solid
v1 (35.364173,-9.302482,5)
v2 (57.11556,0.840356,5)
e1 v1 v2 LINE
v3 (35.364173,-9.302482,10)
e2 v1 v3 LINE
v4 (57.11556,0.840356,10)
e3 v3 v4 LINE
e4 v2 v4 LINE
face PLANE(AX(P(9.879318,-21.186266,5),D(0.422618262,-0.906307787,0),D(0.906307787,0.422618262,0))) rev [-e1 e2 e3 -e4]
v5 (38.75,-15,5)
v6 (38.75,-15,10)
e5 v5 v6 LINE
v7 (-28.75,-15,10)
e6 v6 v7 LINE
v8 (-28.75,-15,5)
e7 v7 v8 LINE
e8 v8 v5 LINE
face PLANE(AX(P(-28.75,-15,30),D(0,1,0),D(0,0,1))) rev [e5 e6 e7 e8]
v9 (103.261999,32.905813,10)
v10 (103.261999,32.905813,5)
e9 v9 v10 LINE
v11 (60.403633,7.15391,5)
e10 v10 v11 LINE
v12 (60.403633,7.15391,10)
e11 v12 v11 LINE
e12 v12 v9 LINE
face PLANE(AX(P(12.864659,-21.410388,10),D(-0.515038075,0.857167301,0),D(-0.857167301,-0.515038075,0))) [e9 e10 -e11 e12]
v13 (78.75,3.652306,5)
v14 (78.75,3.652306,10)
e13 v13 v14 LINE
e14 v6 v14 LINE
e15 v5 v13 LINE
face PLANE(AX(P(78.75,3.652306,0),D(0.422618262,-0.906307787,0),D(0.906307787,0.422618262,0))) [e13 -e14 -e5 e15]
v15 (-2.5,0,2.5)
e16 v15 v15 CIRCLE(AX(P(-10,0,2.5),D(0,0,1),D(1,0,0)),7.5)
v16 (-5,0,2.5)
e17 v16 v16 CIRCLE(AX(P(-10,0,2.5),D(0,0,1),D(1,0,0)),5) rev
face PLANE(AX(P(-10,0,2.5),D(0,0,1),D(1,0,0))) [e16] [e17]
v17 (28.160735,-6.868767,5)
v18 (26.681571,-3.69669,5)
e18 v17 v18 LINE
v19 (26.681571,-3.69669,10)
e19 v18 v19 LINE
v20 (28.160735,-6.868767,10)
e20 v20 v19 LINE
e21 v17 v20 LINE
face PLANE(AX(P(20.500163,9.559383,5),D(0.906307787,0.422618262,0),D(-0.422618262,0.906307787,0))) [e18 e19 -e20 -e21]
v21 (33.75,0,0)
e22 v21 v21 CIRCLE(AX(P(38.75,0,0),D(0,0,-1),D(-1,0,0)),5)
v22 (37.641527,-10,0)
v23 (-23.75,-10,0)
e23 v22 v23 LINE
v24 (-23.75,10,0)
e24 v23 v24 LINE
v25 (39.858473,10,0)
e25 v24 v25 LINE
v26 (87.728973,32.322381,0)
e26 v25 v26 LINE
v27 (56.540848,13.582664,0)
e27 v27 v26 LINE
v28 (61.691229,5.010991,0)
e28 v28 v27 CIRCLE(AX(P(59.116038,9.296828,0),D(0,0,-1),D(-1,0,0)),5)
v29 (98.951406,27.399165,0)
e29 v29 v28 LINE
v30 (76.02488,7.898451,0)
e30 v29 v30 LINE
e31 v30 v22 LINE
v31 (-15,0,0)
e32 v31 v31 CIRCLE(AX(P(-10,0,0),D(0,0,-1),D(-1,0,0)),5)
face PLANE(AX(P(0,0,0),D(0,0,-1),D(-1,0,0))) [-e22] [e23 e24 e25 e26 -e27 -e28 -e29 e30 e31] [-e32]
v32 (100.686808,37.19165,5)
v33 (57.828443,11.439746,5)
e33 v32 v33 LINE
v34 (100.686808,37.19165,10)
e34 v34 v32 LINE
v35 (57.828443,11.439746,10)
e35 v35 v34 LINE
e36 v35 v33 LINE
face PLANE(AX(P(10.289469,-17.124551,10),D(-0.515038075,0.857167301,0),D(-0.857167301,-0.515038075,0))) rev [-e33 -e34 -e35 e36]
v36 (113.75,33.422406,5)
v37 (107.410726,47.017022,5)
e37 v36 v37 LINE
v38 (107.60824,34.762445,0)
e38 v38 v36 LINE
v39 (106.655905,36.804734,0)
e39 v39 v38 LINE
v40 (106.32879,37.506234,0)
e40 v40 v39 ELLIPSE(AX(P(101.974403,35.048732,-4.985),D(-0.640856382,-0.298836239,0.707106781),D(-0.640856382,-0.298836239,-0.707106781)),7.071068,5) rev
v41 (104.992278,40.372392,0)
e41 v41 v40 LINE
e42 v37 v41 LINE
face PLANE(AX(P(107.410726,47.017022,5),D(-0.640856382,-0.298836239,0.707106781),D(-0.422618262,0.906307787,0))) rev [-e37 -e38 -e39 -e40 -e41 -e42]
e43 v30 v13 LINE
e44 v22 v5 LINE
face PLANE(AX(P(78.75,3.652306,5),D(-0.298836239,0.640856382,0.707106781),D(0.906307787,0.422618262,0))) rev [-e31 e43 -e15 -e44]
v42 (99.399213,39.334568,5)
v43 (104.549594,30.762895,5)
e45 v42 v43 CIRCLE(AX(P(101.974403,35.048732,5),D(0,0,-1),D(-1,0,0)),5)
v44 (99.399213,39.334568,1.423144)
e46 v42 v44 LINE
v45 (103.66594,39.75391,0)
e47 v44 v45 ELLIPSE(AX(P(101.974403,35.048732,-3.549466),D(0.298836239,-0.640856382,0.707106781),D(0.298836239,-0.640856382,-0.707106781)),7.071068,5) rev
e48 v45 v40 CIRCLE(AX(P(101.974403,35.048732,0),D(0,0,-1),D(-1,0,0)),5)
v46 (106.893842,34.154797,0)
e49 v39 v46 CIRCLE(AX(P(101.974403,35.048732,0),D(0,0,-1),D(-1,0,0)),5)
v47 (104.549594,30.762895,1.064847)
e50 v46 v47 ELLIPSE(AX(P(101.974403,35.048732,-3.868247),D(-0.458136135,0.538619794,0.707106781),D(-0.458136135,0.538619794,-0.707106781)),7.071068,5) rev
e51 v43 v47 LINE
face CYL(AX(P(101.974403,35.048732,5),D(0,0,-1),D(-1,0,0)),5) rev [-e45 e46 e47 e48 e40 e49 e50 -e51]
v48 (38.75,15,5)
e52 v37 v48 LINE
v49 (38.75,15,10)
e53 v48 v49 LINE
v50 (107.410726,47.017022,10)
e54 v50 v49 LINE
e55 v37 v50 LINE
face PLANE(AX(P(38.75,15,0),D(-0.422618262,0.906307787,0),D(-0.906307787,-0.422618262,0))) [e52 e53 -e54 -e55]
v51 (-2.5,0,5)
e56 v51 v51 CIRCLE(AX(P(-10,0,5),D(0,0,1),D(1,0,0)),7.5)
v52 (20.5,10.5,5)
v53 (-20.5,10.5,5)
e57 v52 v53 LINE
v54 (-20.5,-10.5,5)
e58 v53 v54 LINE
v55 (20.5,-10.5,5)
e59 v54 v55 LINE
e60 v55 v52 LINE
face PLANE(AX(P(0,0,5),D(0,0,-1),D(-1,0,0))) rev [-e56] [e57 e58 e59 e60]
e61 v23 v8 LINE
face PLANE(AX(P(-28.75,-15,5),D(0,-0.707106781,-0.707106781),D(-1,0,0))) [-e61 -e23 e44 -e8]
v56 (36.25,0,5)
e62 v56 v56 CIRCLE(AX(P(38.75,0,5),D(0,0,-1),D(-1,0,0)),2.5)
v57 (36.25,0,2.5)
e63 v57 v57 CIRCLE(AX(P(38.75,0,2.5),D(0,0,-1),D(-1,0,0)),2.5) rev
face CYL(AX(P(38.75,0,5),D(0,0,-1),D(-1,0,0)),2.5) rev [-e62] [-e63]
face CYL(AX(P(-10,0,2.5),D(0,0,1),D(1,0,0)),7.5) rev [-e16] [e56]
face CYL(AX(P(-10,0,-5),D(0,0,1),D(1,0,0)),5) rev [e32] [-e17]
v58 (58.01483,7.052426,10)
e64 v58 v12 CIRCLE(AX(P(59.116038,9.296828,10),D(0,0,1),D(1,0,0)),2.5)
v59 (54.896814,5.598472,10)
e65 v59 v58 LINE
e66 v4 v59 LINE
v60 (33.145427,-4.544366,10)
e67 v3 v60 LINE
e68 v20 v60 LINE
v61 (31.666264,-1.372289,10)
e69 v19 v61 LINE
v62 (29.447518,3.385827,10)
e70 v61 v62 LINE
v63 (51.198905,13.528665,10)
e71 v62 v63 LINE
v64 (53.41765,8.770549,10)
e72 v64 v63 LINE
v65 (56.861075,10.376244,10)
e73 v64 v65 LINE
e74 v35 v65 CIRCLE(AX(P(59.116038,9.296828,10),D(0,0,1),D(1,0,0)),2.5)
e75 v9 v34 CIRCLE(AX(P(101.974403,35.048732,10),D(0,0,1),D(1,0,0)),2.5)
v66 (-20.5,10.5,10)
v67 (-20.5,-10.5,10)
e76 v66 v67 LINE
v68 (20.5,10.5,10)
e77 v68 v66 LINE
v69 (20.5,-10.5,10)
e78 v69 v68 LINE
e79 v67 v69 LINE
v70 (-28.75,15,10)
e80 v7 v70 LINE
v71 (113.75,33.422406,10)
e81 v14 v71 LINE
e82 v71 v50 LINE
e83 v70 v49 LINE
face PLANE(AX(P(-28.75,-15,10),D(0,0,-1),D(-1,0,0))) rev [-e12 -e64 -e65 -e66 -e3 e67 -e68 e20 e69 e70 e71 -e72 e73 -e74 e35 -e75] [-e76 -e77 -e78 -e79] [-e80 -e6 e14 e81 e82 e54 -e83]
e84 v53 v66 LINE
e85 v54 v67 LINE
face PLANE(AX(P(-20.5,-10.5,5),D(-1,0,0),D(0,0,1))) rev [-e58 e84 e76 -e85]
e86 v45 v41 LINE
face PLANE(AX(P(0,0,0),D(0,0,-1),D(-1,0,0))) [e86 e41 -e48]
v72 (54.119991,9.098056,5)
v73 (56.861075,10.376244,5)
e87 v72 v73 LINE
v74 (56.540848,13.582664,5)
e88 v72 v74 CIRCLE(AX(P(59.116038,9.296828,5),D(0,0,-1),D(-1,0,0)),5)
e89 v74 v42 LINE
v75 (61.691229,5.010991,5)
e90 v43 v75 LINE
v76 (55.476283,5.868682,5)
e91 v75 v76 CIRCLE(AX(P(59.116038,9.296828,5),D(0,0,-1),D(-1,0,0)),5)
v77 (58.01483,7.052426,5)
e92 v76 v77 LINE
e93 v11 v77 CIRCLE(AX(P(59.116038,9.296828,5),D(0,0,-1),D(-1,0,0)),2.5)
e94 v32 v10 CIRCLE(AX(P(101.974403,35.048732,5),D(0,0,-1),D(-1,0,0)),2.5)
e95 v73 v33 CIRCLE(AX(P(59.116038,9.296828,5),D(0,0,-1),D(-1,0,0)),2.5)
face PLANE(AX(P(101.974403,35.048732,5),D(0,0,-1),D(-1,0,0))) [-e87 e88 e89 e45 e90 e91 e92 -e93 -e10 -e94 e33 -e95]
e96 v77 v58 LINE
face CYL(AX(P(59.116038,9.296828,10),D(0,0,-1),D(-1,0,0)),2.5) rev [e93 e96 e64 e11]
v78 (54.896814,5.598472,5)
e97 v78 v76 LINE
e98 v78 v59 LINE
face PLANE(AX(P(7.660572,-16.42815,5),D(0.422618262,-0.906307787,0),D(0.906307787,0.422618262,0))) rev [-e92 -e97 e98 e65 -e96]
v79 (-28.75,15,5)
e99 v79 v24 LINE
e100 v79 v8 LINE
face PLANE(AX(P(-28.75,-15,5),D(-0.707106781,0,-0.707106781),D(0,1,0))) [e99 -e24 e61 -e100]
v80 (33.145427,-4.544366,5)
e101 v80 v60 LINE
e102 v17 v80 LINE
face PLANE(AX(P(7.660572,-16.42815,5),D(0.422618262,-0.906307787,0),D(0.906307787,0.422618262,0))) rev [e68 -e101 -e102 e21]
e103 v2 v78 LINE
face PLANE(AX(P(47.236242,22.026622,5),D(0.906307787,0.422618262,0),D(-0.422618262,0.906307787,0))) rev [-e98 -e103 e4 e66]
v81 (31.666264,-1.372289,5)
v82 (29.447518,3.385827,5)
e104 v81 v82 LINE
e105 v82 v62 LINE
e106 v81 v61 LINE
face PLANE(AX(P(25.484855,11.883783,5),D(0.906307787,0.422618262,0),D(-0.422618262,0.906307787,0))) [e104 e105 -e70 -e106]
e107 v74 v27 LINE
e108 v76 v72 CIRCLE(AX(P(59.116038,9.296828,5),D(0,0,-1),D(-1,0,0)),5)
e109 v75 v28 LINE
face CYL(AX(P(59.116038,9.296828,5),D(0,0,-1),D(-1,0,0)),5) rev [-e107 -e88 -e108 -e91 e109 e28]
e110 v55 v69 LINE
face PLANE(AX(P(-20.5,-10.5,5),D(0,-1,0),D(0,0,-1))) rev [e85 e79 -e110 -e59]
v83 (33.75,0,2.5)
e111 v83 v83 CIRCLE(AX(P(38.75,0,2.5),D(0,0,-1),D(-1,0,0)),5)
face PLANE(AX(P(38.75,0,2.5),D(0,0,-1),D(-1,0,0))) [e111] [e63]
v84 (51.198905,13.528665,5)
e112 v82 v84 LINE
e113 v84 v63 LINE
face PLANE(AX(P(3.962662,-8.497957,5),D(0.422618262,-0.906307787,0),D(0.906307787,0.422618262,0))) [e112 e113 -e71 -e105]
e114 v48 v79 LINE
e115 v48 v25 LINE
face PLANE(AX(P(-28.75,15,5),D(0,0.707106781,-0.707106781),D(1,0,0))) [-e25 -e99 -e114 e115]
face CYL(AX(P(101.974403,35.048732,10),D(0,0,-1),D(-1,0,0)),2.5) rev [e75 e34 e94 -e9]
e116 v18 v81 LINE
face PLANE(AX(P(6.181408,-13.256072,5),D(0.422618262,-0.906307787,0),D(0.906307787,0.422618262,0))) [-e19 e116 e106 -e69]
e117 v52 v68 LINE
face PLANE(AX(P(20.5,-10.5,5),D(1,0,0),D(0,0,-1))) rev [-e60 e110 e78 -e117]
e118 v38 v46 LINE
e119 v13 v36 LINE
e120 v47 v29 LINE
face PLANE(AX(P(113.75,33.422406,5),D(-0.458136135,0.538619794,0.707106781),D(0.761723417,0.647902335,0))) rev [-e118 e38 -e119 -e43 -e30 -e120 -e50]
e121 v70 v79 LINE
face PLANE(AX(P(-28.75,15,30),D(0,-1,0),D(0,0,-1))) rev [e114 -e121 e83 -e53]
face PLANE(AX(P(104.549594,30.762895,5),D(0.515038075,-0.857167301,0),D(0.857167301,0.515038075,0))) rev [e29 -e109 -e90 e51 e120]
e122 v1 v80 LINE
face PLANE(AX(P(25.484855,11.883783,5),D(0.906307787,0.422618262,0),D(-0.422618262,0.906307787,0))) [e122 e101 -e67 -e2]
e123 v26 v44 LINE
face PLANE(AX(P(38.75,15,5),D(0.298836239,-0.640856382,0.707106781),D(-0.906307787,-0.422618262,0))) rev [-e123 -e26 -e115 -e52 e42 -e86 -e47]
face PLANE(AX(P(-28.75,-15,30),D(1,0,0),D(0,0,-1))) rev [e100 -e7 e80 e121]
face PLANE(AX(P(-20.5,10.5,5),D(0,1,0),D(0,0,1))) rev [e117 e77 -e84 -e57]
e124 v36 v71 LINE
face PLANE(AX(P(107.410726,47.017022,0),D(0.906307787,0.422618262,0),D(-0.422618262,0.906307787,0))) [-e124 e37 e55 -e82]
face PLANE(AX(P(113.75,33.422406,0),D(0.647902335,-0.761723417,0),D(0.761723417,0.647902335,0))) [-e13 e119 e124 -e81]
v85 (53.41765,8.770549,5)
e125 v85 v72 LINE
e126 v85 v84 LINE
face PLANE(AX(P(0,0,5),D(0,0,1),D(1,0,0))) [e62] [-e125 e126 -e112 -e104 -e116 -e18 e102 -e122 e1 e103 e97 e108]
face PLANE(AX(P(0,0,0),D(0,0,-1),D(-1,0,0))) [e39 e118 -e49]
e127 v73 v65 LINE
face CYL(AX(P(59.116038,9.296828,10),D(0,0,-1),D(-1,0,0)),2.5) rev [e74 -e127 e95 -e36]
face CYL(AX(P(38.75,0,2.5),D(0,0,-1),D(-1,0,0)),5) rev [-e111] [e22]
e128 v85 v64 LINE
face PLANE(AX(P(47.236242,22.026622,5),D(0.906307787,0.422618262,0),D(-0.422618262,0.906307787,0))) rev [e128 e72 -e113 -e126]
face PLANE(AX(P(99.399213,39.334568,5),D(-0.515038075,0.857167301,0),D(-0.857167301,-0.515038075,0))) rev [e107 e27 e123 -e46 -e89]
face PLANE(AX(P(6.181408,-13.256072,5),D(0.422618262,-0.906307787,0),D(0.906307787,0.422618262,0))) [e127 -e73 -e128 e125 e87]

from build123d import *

# Parameters (mm, degrees)
SKETCH1_W                = 57.5
SKETCH1_H                = 30
BOSS_EXTRUDE1_DEPTH      = 30
SKETCH2_W                = 41
SKETCH2_H                = 21
CUT_EXTRUDE1_DEPTH       = 25
SKETCH8_R                = 2
CUT_EXTRUDE6_DEPTH       = 10
SKETCH10_R               = 5
CUT_EXTRUDE8_DEPTH       = 10
BOSS_EXTRUDE4_DEPTH      = 30
SKETCH16_R               = 5
CUT_EXTRUDE10_DEPTH      = 30
CHAMFER5_SIZE            = 5
SKETCH20_R               = 7.5
CUT_EXTRUDE13_DEPTH      = 2.5
CUT_EXTRUDE16_DEPTH      = 122.918629513
CUT_EXTRUDE16_DEPTH_BACK = 122.918629513
SKETCH30_W               = 142.5
SKETCH30_H               = 20
CUT_EXTRUDE17_DEPTH      = 5
CUT_EXTRUDE19_DEPTH      = 124.489525441
CUT_EXTRUDE20_DEPTH      = 5
SKETCH35_R               = 2.5
CUT_EXTRUDE21_DEPTH      = 5
SKETCH36_R               = 5
CUT_EXTRUDE22_DEPTH      = 2.5


with BuildPart() as part:
    # Sketch1 → Boss-Extrude1 (new body)
    with BuildSketch(Plane.XY):
        Rectangle(SKETCH1_W, SKETCH1_H)
    extrude(amount=BOSS_EXTRUDE1_DEPTH)

    # Sketch2 → Cut-Extrude1 (cut)
    with BuildSketch(Plane.XY.offset(30)):
        Rectangle(SKETCH2_W, SKETCH2_H)
    extrude(amount=-CUT_EXTRUDE1_DEPTH, mode=Mode.SUBTRACT)

    # Sketch8 → Cut-Extrude6 (cut)
    with BuildSketch(Plane.XY.offset(30)):
        with Locations((24.35, 6)):
            Circle(SKETCH8_R)
        with Locations(Location((24.35, -6, 0), (0, 0, 180))):
            Circle(SKETCH8_R)
        with Locations((-24.35, -6)):
            Circle(SKETCH8_R)
        with Locations(Location((-24.35, 6, 0), (0, 0, 180))):
            Circle(SKETCH8_R)
    extrude(amount=-CUT_EXTRUDE6_DEPTH, mode=Mode.SUBTRACT)

    # Sketch10 → Cut-Extrude8 (cut)
    with BuildSketch(Plane.XY.offset(5)):
        with Locations((-10, 0)):
            Circle(SKETCH10_R)
    extrude(amount=-CUT_EXTRUDE8_DEPTH, mode=Mode.SUBTRACT)

    # Sketch13 → Boss-Extrude4 (add)
    with BuildSketch(Plane.XY.offset(30)):
        Polygon((28.75, 15), (38.75, 15), (107.410726074, 47.017022383), (113.75, 33.422405577), (78.75, 3.652306326), (38.75, -15), (28.75, -15), align=None)
    extrude(amount=-BOSS_EXTRUDE4_DEPTH)

    # Sketch16 → Cut-Extrude10 (cut)
    with BuildSketch(Plane(origin=(1.175656739, -2.521204013, 0), x_dir=(0.9063077870366488, 0.42261826174070183, 0), z_dir=(-0.42261826174070183, 0.9063077870366488, 0))):
        with Locations(Location((97.217429724, -15, 0), (0, 0, 180))):
            Circle(SKETCH16_R)
        with BuildLine():
            Line((67.217429724, -12.5), (82.217429724, -12.5))
            ThreePointArc((82.217429724, -12.5), (84.717429724, -15), (82.217429724, -17.5))
            Line((82.217429724, -17.5), (67.217429724, -17.5))
            ThreePointArc((67.217429724, -17.5), (64.717429724, -15), (67.217429724, -12.5))
        make_face()
    extrude(amount=-CUT_EXTRUDE10_DEPTH, mode=Mode.SUBTRACT)

    # Chamfer5
    # the kernel refuses this chamfer: 5 mm, written as the material it takes off along each edge
    with BuildSketch(Plane(origin=(-28.75, 27.85841494, 0), x_dir=(-0.027495876610586317, 0, 0.9996219169112968), z_dir=(0, -1, 0))) as chamfer5_piece_1:
        Polygon((CHAMFER5_SIZE * 0.999621916911, -CHAMFER5_SIZE * 0.0274958766106), (-CHAMFER5_SIZE * 0.0274958766106, -CHAMFER5_SIZE * 0.999621916911), (0, 0), align=None)
    extrude(amount=55.71682988, mode=Mode.SUBTRACT)
    with BuildSketch(Plane(origin=(-41.60841494, -15, 0), x_dir=(0, -0.027495876610586317, 0.9996219169112968), z_dir=(1, 0, 0)), Plane(origin=(51.60841494, -15, 30), x_dir=(0, -0.027495876610586317, -0.9996219169112968), z_dir=(-1, 0, 0))) as chamfer5_piece_2:
        Polygon((CHAMFER5_SIZE * 0.999621916911, -CHAMFER5_SIZE * 0.0274958766106), (-CHAMFER5_SIZE * 0.0274958766106, -CHAMFER5_SIZE * 0.999621916911), (0, 0), align=None)
    extrude(amount=93.21682988, mode=Mode.SUBTRACT)
    with BuildSketch(Plane(origin=(90.403681589, 9.086507297, 30), x_dir=(-0.4224584769229526, 0.905965127389214, 0.02749587661058631), z_dir=(-0.9063077870366526, -0.4226182617406939, 0)), Plane(origin=(90.403681589, 9.086507297, 0), x_dir=(0.011620259578202724, -0.024919727083573626, 0.9996219169112968), z_dir=(-0.9063077870366526, -0.4226182617406939, 0))) as chamfer5_piece_3:
        Polygon((CHAMFER5_SIZE * 0.999621916911, CHAMFER5_SIZE * 0.0274958766106), (-CHAMFER5_SIZE * 0.0274958766106, CHAMFER5_SIZE * 0.999621916911), (0, 0), align=None)
    extrude(amount=69.851946638, mode=Mode.SUBTRACT)
    with BuildSketch(Plane(origin=(123.544555766, 41.753402643, 0), x_dir=(-0.6476573741944397, 0.7614354223576539, -0.027495876610586414), z_dir=(-0.7617234170999287, -0.6479023351104763, 0))) as chamfer5_piece_4:
        Polygon((CHAMFER5_SIZE * 0.999621916911, -CHAMFER5_SIZE * 0.0274958766106), (-CHAMFER5_SIZE * 0.0274958766106, -CHAMFER5_SIZE * 0.999621916911), (0, 0), align=None)
    extrude(amount=71.665266299, mode=Mode.SUBTRACT)
    with BuildSketch(Plane(origin=(123.544555766, 41.753402643, 30), x_dir=(-0.6476573741944397, 0.7614354223576539, 0.02749587661058634), z_dir=(-0.7617234170999287, -0.6479023351104763, 0))) as chamfer5_piece_5:
        Polygon((CHAMFER5_SIZE * 0.999621916911, CHAMFER5_SIZE * 0.0274958766106), (-CHAMFER5_SIZE * 0.0274958766106, CHAMFER5_SIZE * 0.999621916911), (0, 0), align=None)
    extrude(amount=71.665266299, mode=Mode.SUBTRACT)
    with BuildSketch(Plane(origin=(101.976525103, 58.670703972, 30), x_dir=(-0.9059651273892108, -0.42245847692295924, 0.027495876610586337), z_dir=(0.42261826174070055, -0.9063077870366495, 0))) as chamfer5_piece_6:
        Polygon((CHAMFER5_SIZE * 0.999621916911, CHAMFER5_SIZE * 0.0274958766106), (-CHAMFER5_SIZE * 0.0274958766106, CHAMFER5_SIZE * 0.999621916911), (0, 0), align=None)
    extrude(amount=40.71682988, mode=Mode.SUBTRACT)
    with BuildSketch(Plane(origin=(101.976525103, 58.670703972, 0), x_dir=(-0.9059651273892108, -0.42245847692295924, -0.027495876610586344), z_dir=(0.42261826174070055, -0.9063077870366495, 0))) as chamfer5_piece_7:
        Polygon((CHAMFER5_SIZE * 0.999621916911, -CHAMFER5_SIZE * 0.0274958766106), (-CHAMFER5_SIZE * 0.0274958766106, -CHAMFER5_SIZE * 0.999621916911), (0, 0), align=None)
    extrude(amount=40.71682988, mode=Mode.SUBTRACT)
    with BuildSketch(Plane(origin=(27.096318411, 9.565799029, 30), x_dir=(0.4224584769229604, -0.9059651273892103, 0.027495876610586313), z_dir=(0.9063077870366489, 0.4226182617407018, 0))) as chamfer5_piece_8_section:
        Polygon((CHAMFER5_SIZE * 0.999621916911, CHAMFER5_SIZE * 0.0274958766106), (-CHAMFER5_SIZE * 0.0274958766106, CHAMFER5_SIZE * 0.999621916911), (0, 0), align=None)
    chamfer5_piece_8 = extrude(amount=101.47555893, mode=Mode.PRIVATE)
    chamfer5_piece_8 = split(chamfer5_piece_8, bisect_by=Plane(origin=(81.150743587, 15, 28.329639499), z_dir=(0, 1, 0)), keep=Keep.TOP, mode=Mode.PRIVATE)
    add(chamfer5_piece_8, mode=Mode.SUBTRACT)
    with BuildSketch(Plane(origin=(27.096318411, 9.565799029, 0), x_dir=(0.4224584769229604, -0.9059651273892103, -0.02749587661058636), z_dir=(0.9063077870366489, 0.4226182617407018, 0))) as chamfer5_piece_9_section:
        Polygon((CHAMFER5_SIZE * 0.999621916911, -CHAMFER5_SIZE * 0.0274958766106), (-CHAMFER5_SIZE * 0.0274958766106, -CHAMFER5_SIZE * 0.999621916911), (0, 0), align=None)
    chamfer5_piece_9 = extrude(amount=101.47555893, mode=Mode.PRIVATE)
    chamfer5_piece_9 = split(chamfer5_piece_9, bisect_by=Plane(origin=(81.150743587, 15, 1.670360501), z_dir=(0, 1, 0)), keep=Keep.TOP, mode=Mode.PRIVATE)
    add(chamfer5_piece_9, mode=Mode.SUBTRACT)
    with BuildSketch(Plane(origin=(-41.60841494, 15, 0), x_dir=(0, -0.9996219169112968, -0.027495876610586372), z_dir=(1, 0, 0))) as chamfer5_piece_10_section:
        Polygon((CHAMFER5_SIZE * 0.999621916911, -CHAMFER5_SIZE * 0.0274958766106), (-CHAMFER5_SIZE * 0.0274958766106, -CHAMFER5_SIZE * 0.999621916911), (0, 0), align=None)
    chamfer5_piece_10 = extrude(amount=93.21682988, mode=Mode.PRIVATE)
    chamfer5_piece_10 = split(chamfer5_piece_10, bisect_by=Plane(origin=(3.719146846, -1.335155097, 1.672660276), z_dir=(-0.4226182617407018, 0.9063077870366489, 0)), keep=Keep.TOP, mode=Mode.PRIVATE)
    add(chamfer5_piece_10, mode=Mode.SUBTRACT)
    with BuildSketch(Plane(origin=(51.60841494, 15, 30), x_dir=(0, -0.9996219169112968, 0.027495876610586317), z_dir=(-1, 0, 0))) as chamfer5_piece_11_section:
        Polygon((CHAMFER5_SIZE * 0.999621916911, -CHAMFER5_SIZE * 0.0274958766106), (-CHAMFER5_SIZE * 0.0274958766106, -CHAMFER5_SIZE * 0.999621916911), (0, 0), align=None)
    chamfer5_piece_11 = extrude(amount=93.21682988, mode=Mode.PRIVATE)
    chamfer5_piece_11 = split(chamfer5_piece_11, bisect_by=Plane(origin=(3.719146846, -1.335155097, 28.327339724), z_dir=(-0.4226182617407018, 0.9063077870366489, 0)), keep=Keep.TOP, mode=Mode.PRIVATE)
    add(chamfer5_piece_11, mode=Mode.SUBTRACT)
    with BuildSketch(Plane(origin=(27.096318411, 9.565799029, 30), x_dir=(0.4224584769229604, -0.9059651273892103, 0.027495876610586313), z_dir=(0.9063077870366489, 0.4226182617407018, 0))) as chamfer5_piece_12a_section:
        Polygon((CHAMFER5_SIZE * 0.999621916911, CHAMFER5_SIZE * 0.0274958766106), (-CHAMFER5_SIZE * 0.0274958766106, CHAMFER5_SIZE * 0.999621916911), (0, 0), align=None)
    chamfer5_piece_12a = extrude(amount=101.47555893, mode=Mode.PRIVATE)
    chamfer5_piece_12a = split(chamfer5_piece_12a, bisect_by=Plane(origin=(35.512062488, 15, 28.462048788), z_dir=(0, -1, 0)), keep=Keep.TOP, mode=Mode.PRIVATE)
    with BuildSketch(Plane(origin=(51.60841494, 15, 30), x_dir=(0, -0.9996219169112968, 0.027495876610586317), z_dir=(-1, 0, 0))) as chamfer5_piece_12b_section:
        Polygon((CHAMFER5_SIZE * 0.999621916911, -CHAMFER5_SIZE * 0.0274958766106), (-CHAMFER5_SIZE * 0.0274958766106, -CHAMFER5_SIZE * 0.999621916911), (0, 0), align=None)
    chamfer5_piece_12b = extrude(amount=93.21682988, mode=Mode.PRIVATE)
    chamfer5_piece_12b = split(chamfer5_piece_12b, bisect_by=Plane(origin=(41.684567981, 16.368411523, 28.462048788), z_dir=(0.4226182617407018, -0.9063077870366489, 0)), keep=Keep.TOP, mode=Mode.PRIVATE)
    chamfer5_piece_12 = chamfer5_piece_12a & chamfer5_piece_12b
    add(chamfer5_piece_12, mode=Mode.SUBTRACT)
    with BuildSketch(Plane(origin=(27.096318411, 9.565799029, 0), x_dir=(0.4224584769229604, -0.9059651273892103, -0.02749587661058636), z_dir=(0.9063077870366489, 0.4226182617407018, 0))) as chamfer5_piece_13a_section:
        Polygon((CHAMFER5_SIZE * 0.999621916911, -CHAMFER5_SIZE * 0.0274958766106), (-CHAMFER5_SIZE * 0.0274958766106, -CHAMFER5_SIZE * 0.999621916911), (0, 0), align=None)
    chamfer5_piece_13a = extrude(amount=101.47555893, mode=Mode.PRIVATE)
    chamfer5_piece_13a = split(chamfer5_piece_13a, bisect_by=Plane(origin=(35.512062488, 15, 1.537951212), z_dir=(0, -1, 0)), keep=Keep.TOP, mode=Mode.PRIVATE)
    with BuildSketch(Plane(origin=(-41.60841494, 15, 0), x_dir=(0, -0.9996219169112968, -0.027495876610586372), z_dir=(1, 0, 0))) as chamfer5_piece_13b_section:
        Polygon((CHAMFER5_SIZE * 0.999621916911, -CHAMFER5_SIZE * 0.0274958766106), (-CHAMFER5_SIZE * 0.0274958766106, -CHAMFER5_SIZE * 0.999621916911), (0, 0), align=None)
    chamfer5_piece_13b = extrude(amount=93.21682988, mode=Mode.PRIVATE)
    chamfer5_piece_13b = split(chamfer5_piece_13b, bisect_by=Plane(origin=(41.684567981, 16.368411523, 1.537951212), z_dir=(0.4226182617407018, -0.9063077870366489, 0)), keep=Keep.TOP, mode=Mode.PRIVATE)
    chamfer5_piece_13 = chamfer5_piece_13a & chamfer5_piece_13b
    add(chamfer5_piece_13, mode=Mode.SUBTRACT)

    # Sketch20 → Cut-Extrude13 (cut)
    with BuildSketch(Plane.XY.offset(5)):
        with Locations((-10, 0)):
            Circle(SKETCH20_R)
    extrude(amount=-CUT_EXTRUDE13_DEPTH, mode=Mode.SUBTRACT)

    # Sketch30 → Cut-Extrude16 (cut, two sides: drawn at the far end of the back side and taken through both)
    with BuildSketch(Plane(origin=(0, 15, 0), x_dir=(1, 0, 0), z_dir=(0, 1, 0)).offset(-CUT_EXTRUDE16_DEPTH_BACK)):
        with Locations((42.5, -20)):
            Rectangle(SKETCH30_W, SKETCH30_H)
    extrude(amount=CUT_EXTRUDE16_DEPTH + CUT_EXTRUDE16_DEPTH_BACK, mode=Mode.SUBTRACT)

    # Sketch31 → Cut-Extrude17 (cut)
    with BuildSketch(Plane.XY.offset(10)):
        Polygon((29.447517659, 3.385826677), (31.666263533, -1.372289205), (53.417650422, 8.770549077), (51.198904547, 13.528664959), align=None)
        Polygon((54.896814338, 5.598471822), (33.145427449, -4.544366459), (35.364173323, -9.302482341), (57.115560212, 0.84035594), align=None)
        Polygon((26.681570704, -3.696689644), (28.16073462, -6.868766899), (33.145427449, -4.544366459), (31.666263533, -1.372289205), align=None)
        Polygon((31.666263533, -1.372289205), (33.145427449, -4.544366459), (54.896814338, 5.598471822), (53.417650422, 8.770549077), align=None)
        Polygon((53.417650422, 8.770549077), (54.896814338, 5.598471822), (59.881507166, 7.922872262), (58.40234325, 11.094949516), align=None)
    extrude(amount=-CUT_EXTRUDE17_DEPTH, mode=Mode.SUBTRACT)

    # Sketch33 → Cut-Extrude19 (cut, through all)
    with BuildSketch(Plane.XY):
        with BuildLine():
            Line((60.40363349, 7.153909711), (103.261998525, 32.905813456))
            ThreePointArc((103.261998525, 32.905813456), (104.11732159, 36.336326895), (100.686808151, 37.19164996))
            Line((100.686808151, 37.19164996), (57.828443116, 11.439746214))
            ThreePointArc((57.828443116, 11.439746214), (56.973120051, 8.009232775), (60.40363349, 7.153909711))
        make_face()
    extrude(amount=CUT_EXTRUDE19_DEPTH, mode=Mode.SUBTRACT)

    # Sketch34 → Cut-Extrude20 (cut)
    with BuildSketch(Plane(origin=(0, 0, 0), x_dir=(-1, 0, 0), z_dir=(0, 0, -1))):
        with BuildLine():
            Line((-99.399212963, 39.334568211), (-56.540847928, 13.582664466))
            ThreePointArc((-56.540847928, 13.582664466), (-54.830201799, 6.721637588), (-61.691228677, 5.010991459))
            Line((-61.691228677, 5.010991459), (-104.549593712, 30.762895204))
            ThreePointArc((-104.549593712, 30.762895204), (-106.260239841, 37.623922082), (-99.399212963, 39.334568211))
        make_face()
    extrude(amount=-CUT_EXTRUDE20_DEPTH, mode=Mode.SUBTRACT)

    # Sketch35 → Cut-Extrude21 (cut)
    with BuildSketch(Plane(origin=(0, 0, 0), x_dir=(-1, 0, 0), z_dir=(0, 0, -1))):
        with Locations((-38.75, 0)):
            Circle(SKETCH35_R)
    extrude(amount=-CUT_EXTRUDE21_DEPTH, mode=Mode.SUBTRACT)

    # Sketch36 → Cut-Extrude22 (cut)
    with BuildSketch(Plane(origin=(0, 0, 0), x_dir=(-1, 0, 0), z_dir=(0, 0, -1))):
        with Locations((-38.75, 0)):
            Circle(SKETCH36_R)
    extrude(amount=-CUT_EXTRUDE22_DEPTH, mode=Mode.SUBTRACT)


solid = part.part
